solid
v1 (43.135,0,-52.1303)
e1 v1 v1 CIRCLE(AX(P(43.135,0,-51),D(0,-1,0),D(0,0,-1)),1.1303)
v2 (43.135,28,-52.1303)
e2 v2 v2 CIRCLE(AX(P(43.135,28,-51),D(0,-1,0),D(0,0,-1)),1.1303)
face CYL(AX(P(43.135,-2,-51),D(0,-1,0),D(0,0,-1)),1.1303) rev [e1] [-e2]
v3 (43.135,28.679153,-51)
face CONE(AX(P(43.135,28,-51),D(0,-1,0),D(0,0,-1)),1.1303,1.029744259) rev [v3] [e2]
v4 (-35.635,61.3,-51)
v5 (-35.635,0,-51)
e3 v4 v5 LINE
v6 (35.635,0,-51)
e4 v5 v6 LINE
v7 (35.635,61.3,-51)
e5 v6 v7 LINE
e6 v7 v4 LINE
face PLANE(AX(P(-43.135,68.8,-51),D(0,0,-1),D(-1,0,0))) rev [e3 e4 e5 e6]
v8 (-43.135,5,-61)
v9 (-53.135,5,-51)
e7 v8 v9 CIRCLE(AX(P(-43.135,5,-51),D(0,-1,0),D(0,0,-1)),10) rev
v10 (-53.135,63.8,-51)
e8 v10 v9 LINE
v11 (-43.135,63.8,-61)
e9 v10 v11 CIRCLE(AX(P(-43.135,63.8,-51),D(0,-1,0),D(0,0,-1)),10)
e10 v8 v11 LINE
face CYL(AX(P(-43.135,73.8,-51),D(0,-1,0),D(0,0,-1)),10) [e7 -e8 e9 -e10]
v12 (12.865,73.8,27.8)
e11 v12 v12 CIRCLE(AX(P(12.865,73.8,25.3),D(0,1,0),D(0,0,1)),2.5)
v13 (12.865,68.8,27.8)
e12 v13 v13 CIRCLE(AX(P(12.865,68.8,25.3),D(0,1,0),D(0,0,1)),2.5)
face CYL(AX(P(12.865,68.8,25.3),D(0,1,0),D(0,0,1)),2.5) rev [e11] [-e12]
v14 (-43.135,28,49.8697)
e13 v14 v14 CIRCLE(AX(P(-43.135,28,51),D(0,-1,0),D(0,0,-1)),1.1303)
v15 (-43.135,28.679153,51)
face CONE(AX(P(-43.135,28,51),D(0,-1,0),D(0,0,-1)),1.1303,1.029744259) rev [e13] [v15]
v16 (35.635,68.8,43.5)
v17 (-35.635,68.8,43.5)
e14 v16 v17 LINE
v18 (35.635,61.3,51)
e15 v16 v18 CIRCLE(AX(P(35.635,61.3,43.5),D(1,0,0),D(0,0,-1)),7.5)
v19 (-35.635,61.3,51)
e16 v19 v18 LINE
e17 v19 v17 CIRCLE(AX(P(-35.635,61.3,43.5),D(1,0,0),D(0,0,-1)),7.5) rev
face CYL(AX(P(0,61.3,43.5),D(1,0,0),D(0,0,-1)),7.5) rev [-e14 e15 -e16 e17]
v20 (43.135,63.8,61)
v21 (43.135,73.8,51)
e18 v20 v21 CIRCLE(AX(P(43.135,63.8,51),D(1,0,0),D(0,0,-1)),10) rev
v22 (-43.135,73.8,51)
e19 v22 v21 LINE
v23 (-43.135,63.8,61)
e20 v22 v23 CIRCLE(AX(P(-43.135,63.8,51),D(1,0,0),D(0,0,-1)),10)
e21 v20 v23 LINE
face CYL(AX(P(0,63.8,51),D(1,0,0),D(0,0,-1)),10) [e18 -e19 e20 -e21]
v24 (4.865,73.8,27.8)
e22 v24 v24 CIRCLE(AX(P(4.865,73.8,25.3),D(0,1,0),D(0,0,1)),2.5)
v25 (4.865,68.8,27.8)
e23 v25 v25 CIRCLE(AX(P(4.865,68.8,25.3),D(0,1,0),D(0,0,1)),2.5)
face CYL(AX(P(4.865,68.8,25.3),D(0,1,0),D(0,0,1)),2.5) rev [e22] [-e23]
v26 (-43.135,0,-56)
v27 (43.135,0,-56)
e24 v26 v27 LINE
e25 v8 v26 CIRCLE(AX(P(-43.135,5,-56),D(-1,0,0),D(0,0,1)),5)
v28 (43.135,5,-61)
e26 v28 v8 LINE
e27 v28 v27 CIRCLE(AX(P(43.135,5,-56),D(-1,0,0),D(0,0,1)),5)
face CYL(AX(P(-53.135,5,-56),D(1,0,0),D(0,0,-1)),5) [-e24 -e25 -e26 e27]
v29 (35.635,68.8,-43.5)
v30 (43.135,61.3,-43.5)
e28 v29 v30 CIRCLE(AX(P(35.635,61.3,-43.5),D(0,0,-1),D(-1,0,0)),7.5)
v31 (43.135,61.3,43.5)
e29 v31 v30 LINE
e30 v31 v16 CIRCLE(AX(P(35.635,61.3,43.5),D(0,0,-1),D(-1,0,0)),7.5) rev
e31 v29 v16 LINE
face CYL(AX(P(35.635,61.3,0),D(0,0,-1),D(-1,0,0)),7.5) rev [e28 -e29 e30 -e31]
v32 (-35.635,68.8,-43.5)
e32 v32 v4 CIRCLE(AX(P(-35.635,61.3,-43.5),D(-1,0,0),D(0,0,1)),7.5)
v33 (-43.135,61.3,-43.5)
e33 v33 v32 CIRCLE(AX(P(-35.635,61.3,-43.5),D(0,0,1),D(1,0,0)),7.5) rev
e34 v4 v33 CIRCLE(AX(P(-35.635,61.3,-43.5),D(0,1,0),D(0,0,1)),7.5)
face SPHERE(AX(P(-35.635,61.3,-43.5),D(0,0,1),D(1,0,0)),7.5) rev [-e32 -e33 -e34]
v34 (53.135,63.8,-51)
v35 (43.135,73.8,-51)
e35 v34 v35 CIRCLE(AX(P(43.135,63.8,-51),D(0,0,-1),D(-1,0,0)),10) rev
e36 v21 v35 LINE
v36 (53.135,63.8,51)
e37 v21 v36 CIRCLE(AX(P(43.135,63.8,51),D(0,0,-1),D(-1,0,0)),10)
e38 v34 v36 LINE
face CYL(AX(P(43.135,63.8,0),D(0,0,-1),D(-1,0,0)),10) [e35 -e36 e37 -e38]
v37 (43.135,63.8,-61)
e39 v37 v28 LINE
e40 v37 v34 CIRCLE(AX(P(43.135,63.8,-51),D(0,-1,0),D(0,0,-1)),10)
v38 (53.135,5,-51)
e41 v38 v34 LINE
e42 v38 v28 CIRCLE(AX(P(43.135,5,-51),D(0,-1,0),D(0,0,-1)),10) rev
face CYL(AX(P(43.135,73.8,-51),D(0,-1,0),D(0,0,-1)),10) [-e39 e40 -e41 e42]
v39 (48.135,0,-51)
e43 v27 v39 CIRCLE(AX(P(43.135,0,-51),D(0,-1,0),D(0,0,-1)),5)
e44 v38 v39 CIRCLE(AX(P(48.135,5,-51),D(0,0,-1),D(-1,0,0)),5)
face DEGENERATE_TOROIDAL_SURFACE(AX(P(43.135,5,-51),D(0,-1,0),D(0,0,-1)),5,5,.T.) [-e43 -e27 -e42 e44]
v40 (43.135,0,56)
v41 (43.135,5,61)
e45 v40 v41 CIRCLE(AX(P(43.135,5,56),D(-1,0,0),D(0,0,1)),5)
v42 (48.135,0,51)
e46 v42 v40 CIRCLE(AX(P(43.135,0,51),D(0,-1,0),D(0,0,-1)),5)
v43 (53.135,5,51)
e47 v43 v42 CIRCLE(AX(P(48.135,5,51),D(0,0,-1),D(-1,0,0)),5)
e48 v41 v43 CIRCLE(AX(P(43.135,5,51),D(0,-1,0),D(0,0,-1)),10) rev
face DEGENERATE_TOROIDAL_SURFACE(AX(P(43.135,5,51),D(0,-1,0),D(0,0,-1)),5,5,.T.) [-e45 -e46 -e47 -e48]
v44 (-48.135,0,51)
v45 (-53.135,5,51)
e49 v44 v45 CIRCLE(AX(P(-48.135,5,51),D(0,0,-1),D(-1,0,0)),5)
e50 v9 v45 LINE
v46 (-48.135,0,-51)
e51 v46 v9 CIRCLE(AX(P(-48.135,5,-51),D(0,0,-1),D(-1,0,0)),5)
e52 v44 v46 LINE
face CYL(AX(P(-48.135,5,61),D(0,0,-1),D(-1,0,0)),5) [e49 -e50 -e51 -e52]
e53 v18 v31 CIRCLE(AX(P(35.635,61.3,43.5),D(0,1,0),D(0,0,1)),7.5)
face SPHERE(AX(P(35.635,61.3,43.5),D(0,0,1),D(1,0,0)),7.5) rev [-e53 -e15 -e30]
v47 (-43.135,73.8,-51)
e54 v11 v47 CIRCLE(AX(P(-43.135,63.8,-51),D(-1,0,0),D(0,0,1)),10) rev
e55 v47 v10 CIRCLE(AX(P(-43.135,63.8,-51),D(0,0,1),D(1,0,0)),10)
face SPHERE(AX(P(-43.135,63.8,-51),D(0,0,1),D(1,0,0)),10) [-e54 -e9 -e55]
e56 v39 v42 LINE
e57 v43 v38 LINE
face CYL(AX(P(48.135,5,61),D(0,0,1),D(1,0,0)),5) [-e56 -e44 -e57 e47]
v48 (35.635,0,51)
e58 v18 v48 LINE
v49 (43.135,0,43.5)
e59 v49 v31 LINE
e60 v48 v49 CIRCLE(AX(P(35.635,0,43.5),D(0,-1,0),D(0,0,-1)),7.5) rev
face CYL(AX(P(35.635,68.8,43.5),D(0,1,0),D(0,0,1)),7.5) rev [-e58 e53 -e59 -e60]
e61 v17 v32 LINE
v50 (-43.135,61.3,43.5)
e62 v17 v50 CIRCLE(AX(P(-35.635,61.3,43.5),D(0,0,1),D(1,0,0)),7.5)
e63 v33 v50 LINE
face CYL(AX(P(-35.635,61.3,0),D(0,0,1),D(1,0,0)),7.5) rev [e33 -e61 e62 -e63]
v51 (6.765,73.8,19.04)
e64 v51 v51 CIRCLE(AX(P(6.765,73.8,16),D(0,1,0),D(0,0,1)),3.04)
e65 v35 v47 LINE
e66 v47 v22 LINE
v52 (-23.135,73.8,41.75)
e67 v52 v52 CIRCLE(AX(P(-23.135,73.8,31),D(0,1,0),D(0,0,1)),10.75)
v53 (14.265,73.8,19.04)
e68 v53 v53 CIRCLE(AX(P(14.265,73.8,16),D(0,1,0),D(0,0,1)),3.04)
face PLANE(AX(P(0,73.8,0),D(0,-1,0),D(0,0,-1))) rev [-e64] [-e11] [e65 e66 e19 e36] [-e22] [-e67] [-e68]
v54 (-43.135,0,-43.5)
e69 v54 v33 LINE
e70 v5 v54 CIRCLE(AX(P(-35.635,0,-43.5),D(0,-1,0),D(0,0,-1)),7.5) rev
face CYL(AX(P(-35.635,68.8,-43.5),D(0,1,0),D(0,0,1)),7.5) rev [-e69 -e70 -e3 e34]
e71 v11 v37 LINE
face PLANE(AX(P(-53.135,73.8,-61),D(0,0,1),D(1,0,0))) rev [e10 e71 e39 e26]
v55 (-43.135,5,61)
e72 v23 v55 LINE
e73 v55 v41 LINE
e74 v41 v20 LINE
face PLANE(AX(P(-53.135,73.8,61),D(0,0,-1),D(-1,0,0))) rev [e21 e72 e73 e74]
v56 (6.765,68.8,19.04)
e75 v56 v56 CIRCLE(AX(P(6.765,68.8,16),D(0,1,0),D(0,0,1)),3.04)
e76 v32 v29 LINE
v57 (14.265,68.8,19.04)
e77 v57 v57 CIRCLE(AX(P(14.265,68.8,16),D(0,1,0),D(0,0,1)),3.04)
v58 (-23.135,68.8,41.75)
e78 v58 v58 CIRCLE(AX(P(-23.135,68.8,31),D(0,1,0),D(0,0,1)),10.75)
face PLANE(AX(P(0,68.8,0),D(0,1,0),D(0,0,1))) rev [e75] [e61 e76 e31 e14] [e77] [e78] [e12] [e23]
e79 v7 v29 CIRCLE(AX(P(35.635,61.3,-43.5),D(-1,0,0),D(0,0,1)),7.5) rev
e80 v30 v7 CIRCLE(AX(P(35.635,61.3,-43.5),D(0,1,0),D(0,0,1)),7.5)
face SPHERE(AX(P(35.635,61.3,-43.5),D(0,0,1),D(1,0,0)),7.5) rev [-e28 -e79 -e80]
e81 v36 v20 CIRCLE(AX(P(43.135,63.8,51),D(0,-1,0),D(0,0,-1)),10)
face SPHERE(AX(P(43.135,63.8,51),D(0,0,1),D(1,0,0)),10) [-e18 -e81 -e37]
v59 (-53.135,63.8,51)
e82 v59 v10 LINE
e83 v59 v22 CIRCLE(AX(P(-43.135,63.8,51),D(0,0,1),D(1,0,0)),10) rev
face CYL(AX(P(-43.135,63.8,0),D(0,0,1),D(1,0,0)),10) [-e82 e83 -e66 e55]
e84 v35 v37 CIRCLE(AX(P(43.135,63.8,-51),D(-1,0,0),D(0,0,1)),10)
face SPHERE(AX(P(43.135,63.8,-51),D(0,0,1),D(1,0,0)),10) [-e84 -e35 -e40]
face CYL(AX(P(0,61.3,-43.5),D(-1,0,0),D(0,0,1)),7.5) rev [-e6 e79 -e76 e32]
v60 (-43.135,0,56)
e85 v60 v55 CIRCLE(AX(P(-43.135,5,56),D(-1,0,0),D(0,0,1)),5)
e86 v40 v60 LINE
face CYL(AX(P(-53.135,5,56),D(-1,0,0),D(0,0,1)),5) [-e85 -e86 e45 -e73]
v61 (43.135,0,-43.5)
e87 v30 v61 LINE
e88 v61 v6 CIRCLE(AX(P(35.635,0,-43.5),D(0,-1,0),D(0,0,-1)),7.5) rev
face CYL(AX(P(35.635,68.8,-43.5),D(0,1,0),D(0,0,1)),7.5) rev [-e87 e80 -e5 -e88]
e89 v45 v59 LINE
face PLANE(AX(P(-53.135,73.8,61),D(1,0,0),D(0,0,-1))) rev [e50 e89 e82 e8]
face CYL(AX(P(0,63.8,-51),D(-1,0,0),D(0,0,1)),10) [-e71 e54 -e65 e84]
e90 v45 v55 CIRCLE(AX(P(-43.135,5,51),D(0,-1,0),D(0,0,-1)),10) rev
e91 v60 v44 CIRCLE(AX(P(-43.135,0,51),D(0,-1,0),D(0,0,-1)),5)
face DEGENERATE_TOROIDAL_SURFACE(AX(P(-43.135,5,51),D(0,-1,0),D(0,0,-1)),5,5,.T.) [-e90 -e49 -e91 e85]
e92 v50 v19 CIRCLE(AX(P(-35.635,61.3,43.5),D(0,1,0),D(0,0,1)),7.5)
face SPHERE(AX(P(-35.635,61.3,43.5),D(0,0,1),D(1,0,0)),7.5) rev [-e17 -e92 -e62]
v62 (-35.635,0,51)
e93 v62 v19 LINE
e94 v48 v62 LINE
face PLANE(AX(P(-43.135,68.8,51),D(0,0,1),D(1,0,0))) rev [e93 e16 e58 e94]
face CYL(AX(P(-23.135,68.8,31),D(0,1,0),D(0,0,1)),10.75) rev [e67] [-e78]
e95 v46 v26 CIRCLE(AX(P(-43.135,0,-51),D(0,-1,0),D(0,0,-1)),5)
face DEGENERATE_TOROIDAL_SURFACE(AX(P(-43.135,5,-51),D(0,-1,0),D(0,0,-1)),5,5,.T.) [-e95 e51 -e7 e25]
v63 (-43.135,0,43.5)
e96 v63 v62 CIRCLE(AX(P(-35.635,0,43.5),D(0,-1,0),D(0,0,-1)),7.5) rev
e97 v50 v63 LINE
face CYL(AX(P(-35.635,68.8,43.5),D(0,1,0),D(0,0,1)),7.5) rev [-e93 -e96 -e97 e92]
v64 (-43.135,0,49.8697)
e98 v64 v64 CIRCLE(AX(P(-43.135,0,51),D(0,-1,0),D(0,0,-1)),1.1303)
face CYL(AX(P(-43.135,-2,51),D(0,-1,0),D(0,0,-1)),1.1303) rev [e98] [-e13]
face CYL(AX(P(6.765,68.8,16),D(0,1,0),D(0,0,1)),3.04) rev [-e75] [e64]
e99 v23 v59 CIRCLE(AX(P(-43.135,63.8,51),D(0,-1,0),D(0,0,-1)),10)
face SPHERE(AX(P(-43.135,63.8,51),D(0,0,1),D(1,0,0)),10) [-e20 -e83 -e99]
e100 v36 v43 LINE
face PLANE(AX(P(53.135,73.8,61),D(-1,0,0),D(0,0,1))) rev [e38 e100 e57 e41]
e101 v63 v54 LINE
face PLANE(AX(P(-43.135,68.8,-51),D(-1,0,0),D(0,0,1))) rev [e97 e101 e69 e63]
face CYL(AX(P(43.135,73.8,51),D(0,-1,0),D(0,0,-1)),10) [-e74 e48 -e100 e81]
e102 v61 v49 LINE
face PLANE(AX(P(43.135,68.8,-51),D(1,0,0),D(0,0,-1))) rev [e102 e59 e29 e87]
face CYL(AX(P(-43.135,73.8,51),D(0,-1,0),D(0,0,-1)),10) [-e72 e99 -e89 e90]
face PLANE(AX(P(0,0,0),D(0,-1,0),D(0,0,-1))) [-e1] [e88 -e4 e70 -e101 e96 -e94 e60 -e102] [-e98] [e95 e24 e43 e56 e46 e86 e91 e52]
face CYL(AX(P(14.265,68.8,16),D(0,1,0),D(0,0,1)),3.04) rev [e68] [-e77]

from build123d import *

# Parameters (mm, degrees)
SKETCH1_W                       = 106.27
SKETCH1_H                       = 122
BOSS_EXTRUDE1_DEPTH             = 73.8
SKETCH2_W                       = 86.27
SKETCH2_H                       = 102
CUT_EXTRUDE1_DEPTH              = 68.8
FILLET1_R                       = 10
FILLET2_R                       = 10
FILLET3_R                       = 7.5
FILLET4_R                       = 7.5
FILLET6_R                       = 5
SKETCH3_R                       = 3.04
CUT_EXTRUDE2_DEPTH              = 5
SKETCH4_R                       = 10.75
CUT_EXTRUDE3_DEPTH              = 5
SKETCH5_R                       = 2.5
CUT_EXTRUDE4_DEPTH              = 5
F_4_40_TAPPED_HOLE3_D           = 2.2606
F_4_40_TAPPED_HOLE3_DEPTH       = 30
F_4_40_TAPPED_HOLE3_CSINK_D     = 4.1148
F_4_40_TAPPED_HOLE3_CSINK_ANGLE = 100
F_4_40_TAPPED_HOLE3_TIP         = 0.679152758
F_4_40_TAPPED_HOLE4_D           = 2.2606
F_4_40_TAPPED_HOLE4_DEPTH       = 30
F_4_40_TAPPED_HOLE4_CSINK_D     = 4.1148
F_4_40_TAPPED_HOLE4_CSINK_ANGLE = 100
F_4_40_TAPPED_HOLE4_TIP         = 0.679152758


with BuildPart() as part:
    # Sketch1 → Boss-Extrude1 (new body)
    with BuildSketch(Plane(origin=(0, 0, 0), x_dir=(1, 0, 0), z_dir=(0, 1, 0))):
        Rectangle(SKETCH1_W, SKETCH1_H)
    extrude(amount=BOSS_EXTRUDE1_DEPTH)

    # Sketch2 → Cut-Extrude1 (cut)
    with BuildSketch(Plane.XZ):
        Rectangle(SKETCH2_W, SKETCH2_H)
    extrude(amount=-CUT_EXTRUDE1_DEPTH, mode=Mode.SUBTRACT)

    # Fillet1
    fillet1_edges = [part.edges().sort_by_distance(p)[0] for p in [
        (-53.135, 73.8, 0),
        (0, 73.8, 61),
        (53.135, 73.8, 0),
        (0, 73.8, -61),
    ]]
    fillet(fillet1_edges, radius=FILLET1_R)

    # Fillet2
    # the kernel refuses this fillet: 10 mm, written as the material it takes off along each edge
    with BuildSketch(Plane(origin=(43.135, 63.8, 51), x_dir=(1, 0, 0), z_dir=(0, 0, 1))) as fillet2_piece_1_section:
        Polygon((0, 0), (FILLET2_R, 0), (FILLET2_R, FILLET2_R), (0, FILLET2_R), align=None)
    fillet2_piece_1 = extrude(amount=FILLET2_R, mode=Mode.PRIVATE)
    fillet2_piece_1 = fillet2_piece_1 - Plane(origin=(43.135, 63.8, 51), x_dir=(-0.7071067811865475, -0.7071067811865475, 0), z_dir=(0, 0, 1)) * Sphere(FILLET2_R, mode=Mode.PRIVATE)
    add(fillet2_piece_1, mode=Mode.SUBTRACT)
    with BuildSketch(Plane(origin=(-43.135, 63.8, 51), x_dir=(-1, 0, 0), z_dir=(0, 0, 1))) as fillet2_piece_2_section:
        Polygon((0, 0), (FILLET2_R, 0), (FILLET2_R, -FILLET2_R), (0, -FILLET2_R), align=None)
    fillet2_piece_2 = extrude(amount=FILLET2_R, mode=Mode.PRIVATE)
    fillet2_piece_2 = fillet2_piece_2 - Plane(origin=(-43.135, 63.8, 51), x_dir=(0.7071067811865475, -0.7071067811865475, 0), z_dir=(0, 0, 1)) * Sphere(FILLET2_R, mode=Mode.PRIVATE)
    add(fillet2_piece_2, mode=Mode.SUBTRACT)
    with BuildSketch(Plane(origin=(43.135, 63.8, -51), x_dir=(0, 0, -1), z_dir=(1, 0, 0))) as fillet2_piece_3_section:
        Polygon((0, 0), (FILLET2_R, 0), (FILLET2_R, FILLET2_R), (0, FILLET2_R), align=None)
    fillet2_piece_3 = extrude(amount=FILLET2_R, mode=Mode.PRIVATE)
    fillet2_piece_3 = fillet2_piece_3 - Plane(origin=(43.135, 63.8, -51), x_dir=(0, -0.7071067811865475, 0.7071067811865475), z_dir=(1, 0, 0)) * Sphere(FILLET2_R, mode=Mode.PRIVATE)
    add(fillet2_piece_3, mode=Mode.SUBTRACT)
    with BuildSketch(Plane(origin=(-43.135, 63.8, -51), x_dir=(0, 0, -1), z_dir=(-1, 0, 0))) as fillet2_piece_4_section:
        Polygon((0, 0), (FILLET2_R, 0), (FILLET2_R, -FILLET2_R), (0, -FILLET2_R), align=None)
    fillet2_piece_4 = extrude(amount=FILLET2_R, mode=Mode.PRIVATE)
    fillet2_piece_4 = fillet2_piece_4 - Plane(origin=(-43.135, 63.8, -51), x_dir=(0, -0.7071067811865475, 0.7071067811865475), z_dir=(-1, 0, 0)) * Sphere(FILLET2_R, mode=Mode.PRIVATE)
    add(fillet2_piece_4, mode=Mode.SUBTRACT)
    with BuildSketch(Plane(origin=(-53.135, -25, -61), x_dir=(0, 0, 1), z_dir=(0, 1, 0)), Plane(origin=(-53.135, -25, 61), x_dir=(1, 0, 0), z_dir=(0, 1, 0))) as fillet2_piece_5:
        with BuildLine():
            CenterArc((FILLET2_R, FILLET2_R), FILLET2_R, 180, 90)
            Line((0, FILLET2_R), (0, 0))
            Line((0, 0), (FILLET2_R, 0))
        make_face()
    extrude(amount=88.8, mode=Mode.SUBTRACT)
    with BuildSketch(Plane(origin=(53.135, -25, -61), x_dir=(0, 0, 1), z_dir=(0, 1, 0)), Plane(origin=(53.135, -25, 61), x_dir=(-1, 0, 0), z_dir=(0, 1, 0))) as fillet2_piece_6:
        with BuildLine():
            CenterArc((FILLET2_R, -FILLET2_R), FILLET2_R, 90, 90)
            Line((0, -FILLET2_R), (0, 0))
            Line((0, 0), (FILLET2_R, 0))
        make_face()
    extrude(amount=88.8, mode=Mode.SUBTRACT)

    # Fillet3
    fillet3_edges = [part.edges().sort_by_distance(p)[0] for p in [
        (43.135, 68.8, 0),
        (0, 68.8, -51),
        (-43.135, 68.8, 0),
        (0, 68.8, 51),
    ]]
    fillet(fillet3_edges, radius=FILLET3_R)

    # Fillet4
    # the kernel refuses this fillet: 7.5 mm, written as the material it adds along each edge
    with BuildSketch(Plane(origin=(-35.635, 61.3, -43.5), x_dir=(0, 0, -1), z_dir=(-1, 0, 0))) as fillet4_piece_1_section:
        Polygon((0, 0), (FILLET4_R, 0), (FILLET4_R, -FILLET4_R), (0, -FILLET4_R), align=None)
    fillet4_piece_1 = extrude(amount=FILLET4_R, mode=Mode.PRIVATE)
    fillet4_piece_1 = fillet4_piece_1 - Plane(origin=(-35.635, 61.3, -43.5), x_dir=(0, -0.7071067811865475, 0.7071067811865475), z_dir=(-1, 0, 0)) * Sphere(FILLET4_R, mode=Mode.PRIVATE)
    add(fillet4_piece_1)
    with BuildSketch(Plane(origin=(-35.635, 61.3, 43.5), x_dir=(0, 0, 1), z_dir=(-1, 0, 0))) as fillet4_piece_2_section:
        Polygon((0, 0), (FILLET4_R, 0), (FILLET4_R, FILLET4_R), (0, FILLET4_R), align=None)
    fillet4_piece_2 = extrude(amount=FILLET4_R, mode=Mode.PRIVATE)
    fillet4_piece_2 = fillet4_piece_2 - Plane(origin=(-35.635, 61.3, 43.5), x_dir=(0, -0.7071067811865475, -0.7071067811865475), z_dir=(-1, 0, 0)) * Sphere(FILLET4_R, mode=Mode.PRIVATE)
    add(fillet4_piece_2)
    with BuildSketch(Plane(origin=(35.635, 61.3, -43.5), x_dir=(1, 0, 0), z_dir=(0, 0, -1))) as fillet4_piece_3_section:
        Polygon((0, 0), (FILLET4_R, 0), (FILLET4_R, -FILLET4_R), (0, -FILLET4_R), align=None)
    fillet4_piece_3 = extrude(amount=FILLET4_R, mode=Mode.PRIVATE)
    fillet4_piece_3 = fillet4_piece_3 - Plane(origin=(35.635, 61.3, -43.5), x_dir=(-0.7071067811865475, -0.7071067811865475, 0), z_dir=(0, 0, -1)) * Sphere(FILLET4_R, mode=Mode.PRIVATE)
    add(fillet4_piece_3)
    with BuildSketch(Plane(origin=(35.635, 61.3, 43.5), x_dir=(1, 0, 0), z_dir=(0, 0, 1))) as fillet4_piece_4_section:
        Polygon((0, 0), (FILLET4_R, 0), (FILLET4_R, FILLET4_R), (0, FILLET4_R), align=None)
    fillet4_piece_4 = extrude(amount=FILLET4_R, mode=Mode.PRIVATE)
    fillet4_piece_4 = fillet4_piece_4 - Plane(origin=(35.635, 61.3, 43.5), x_dir=(-0.7071067811865475, -0.7071067811865475, 0), z_dir=(0, 0, 1)) * Sphere(FILLET4_R, mode=Mode.PRIVATE)
    add(fillet4_piece_4)
    with BuildSketch(Plane(origin=(43.135, 0, 51), x_dir=(-1, 0, 0), z_dir=(0, 1, 0)), Plane(origin=(-43.135, 0, 51), x_dir=(0, 0, -1), z_dir=(0, 1, 0))) as fillet4_piece_5:
        with BuildLine():
            CenterArc((FILLET4_R, -FILLET4_R), FILLET4_R, 90, 90)
            Line((0, -FILLET4_R), (0, 0))
            Line((0, 0), (FILLET4_R, 0))
        make_face()
    extrude(amount=61.3)
    with BuildSketch(Plane(origin=(43.135, 0, -51), x_dir=(-1, 0, 0), z_dir=(0, 1, 0)), Plane(origin=(-43.135, 0, -51), x_dir=(0, 0, 1), z_dir=(0, 1, 0))) as fillet4_piece_6:
        with BuildLine():
            CenterArc((FILLET4_R, FILLET4_R), FILLET4_R, 180, 90)
            Line((0, FILLET4_R), (0, 0))
            Line((0, 0), (FILLET4_R, 0))
        make_face()
    extrude(amount=61.3)

    # Fillet6
    fillet6_edges = [part.edges().sort_by_distance(p)[0] for p in [
        (-53.135, 0, 0),
        (53.135, 0, 0),
        (0, 0, 61),
        (0, 0, -61),
        (-50.206067812, 0, 58.071067812),
        (50.206067812, 0, 58.071067812),
        (50.206067812, 0, -58.071067812),
        (-50.206067812, 0, -58.071067812),
    ]]
    fillet(fillet6_edges, radius=FILLET6_R)

    # Sketch3 → Cut-Extrude2 (cut)
    with BuildSketch(Plane(origin=(0, 73.8, 0), x_dir=(1, 0, 0), z_dir=(0, 1, 0))):
        with Locations(Location((14.265, -16, 0), (0, 0, 270))):
            Circle(SKETCH3_R)
        with Locations(Location((6.765, -16, 0), (0, 0, 270))):
            Circle(SKETCH3_R)
    extrude(amount=-CUT_EXTRUDE2_DEPTH, mode=Mode.SUBTRACT)

    # Sketch4 → Cut-Extrude3 (cut)
    with BuildSketch(Plane(origin=(0, 73.8, 0), x_dir=(1, 0, 0), z_dir=(0, 1, 0))):
        with Locations(Location((-23.135, -31, 0), (0, 0, 270))):
            Circle(SKETCH4_R)
    extrude(amount=-CUT_EXTRUDE3_DEPTH, mode=Mode.SUBTRACT)

    # Sketch5 → Cut-Extrude4 (cut)
    with BuildSketch(Plane(origin=(0, 73.8, 0), x_dir=(1, 0, 0), z_dir=(0, 1, 0))):
        with Locations(Location((4.865, -25.3, 0), (0, 0, 270))):
            Circle(SKETCH5_R)
        with Locations(Location((12.865, -25.3, 0), (0, 0, 270))):
            Circle(SKETCH5_R)
    extrude(amount=-CUT_EXTRUDE4_DEPTH, mode=Mode.SUBTRACT)

    # #4-40 Tapped Hole3
    with Locations(Plane(origin=(100.412065725, -2, -32.702388863), x_dir=(-1, 0, 0), z_dir=(0, -1, 0))):
        with Locations((143.547065725, -83.702388863)):
            CounterSinkHole(F_4_40_TAPPED_HOLE3_D / 2, F_4_40_TAPPED_HOLE3_CSINK_D / 2, depth=F_4_40_TAPPED_HOLE3_DEPTH, counter_sink_angle=F_4_40_TAPPED_HOLE3_CSINK_ANGLE)
            with Locations((0, 0, -(F_4_40_TAPPED_HOLE3_DEPTH + F_4_40_TAPPED_HOLE3_TIP / 2))):  # 118° drill point
                Cone(0, F_4_40_TAPPED_HOLE3_D / 2, F_4_40_TAPPED_HOLE3_TIP, mode=Mode.SUBTRACT)

    # #4-40 Tapped Hole4
    with Locations(Plane(origin=(100.412065725, -2, -32.702388863), x_dir=(-1, 0, 0), z_dir=(0, -1, 0))):
        with Locations((57.277065725, 18.297611137)):
            CounterSinkHole(F_4_40_TAPPED_HOLE4_D / 2, F_4_40_TAPPED_HOLE4_CSINK_D / 2, depth=F_4_40_TAPPED_HOLE4_DEPTH, counter_sink_angle=F_4_40_TAPPED_HOLE4_CSINK_ANGLE)
            with Locations((0, 0, -(F_4_40_TAPPED_HOLE4_DEPTH + F_4_40_TAPPED_HOLE4_TIP / 2))):  # 118° drill point
                Cone(0, F_4_40_TAPPED_HOLE4_D / 2, F_4_40_TAPPED_HOLE4_TIP, mode=Mode.SUBTRACT)


solid = part.part
